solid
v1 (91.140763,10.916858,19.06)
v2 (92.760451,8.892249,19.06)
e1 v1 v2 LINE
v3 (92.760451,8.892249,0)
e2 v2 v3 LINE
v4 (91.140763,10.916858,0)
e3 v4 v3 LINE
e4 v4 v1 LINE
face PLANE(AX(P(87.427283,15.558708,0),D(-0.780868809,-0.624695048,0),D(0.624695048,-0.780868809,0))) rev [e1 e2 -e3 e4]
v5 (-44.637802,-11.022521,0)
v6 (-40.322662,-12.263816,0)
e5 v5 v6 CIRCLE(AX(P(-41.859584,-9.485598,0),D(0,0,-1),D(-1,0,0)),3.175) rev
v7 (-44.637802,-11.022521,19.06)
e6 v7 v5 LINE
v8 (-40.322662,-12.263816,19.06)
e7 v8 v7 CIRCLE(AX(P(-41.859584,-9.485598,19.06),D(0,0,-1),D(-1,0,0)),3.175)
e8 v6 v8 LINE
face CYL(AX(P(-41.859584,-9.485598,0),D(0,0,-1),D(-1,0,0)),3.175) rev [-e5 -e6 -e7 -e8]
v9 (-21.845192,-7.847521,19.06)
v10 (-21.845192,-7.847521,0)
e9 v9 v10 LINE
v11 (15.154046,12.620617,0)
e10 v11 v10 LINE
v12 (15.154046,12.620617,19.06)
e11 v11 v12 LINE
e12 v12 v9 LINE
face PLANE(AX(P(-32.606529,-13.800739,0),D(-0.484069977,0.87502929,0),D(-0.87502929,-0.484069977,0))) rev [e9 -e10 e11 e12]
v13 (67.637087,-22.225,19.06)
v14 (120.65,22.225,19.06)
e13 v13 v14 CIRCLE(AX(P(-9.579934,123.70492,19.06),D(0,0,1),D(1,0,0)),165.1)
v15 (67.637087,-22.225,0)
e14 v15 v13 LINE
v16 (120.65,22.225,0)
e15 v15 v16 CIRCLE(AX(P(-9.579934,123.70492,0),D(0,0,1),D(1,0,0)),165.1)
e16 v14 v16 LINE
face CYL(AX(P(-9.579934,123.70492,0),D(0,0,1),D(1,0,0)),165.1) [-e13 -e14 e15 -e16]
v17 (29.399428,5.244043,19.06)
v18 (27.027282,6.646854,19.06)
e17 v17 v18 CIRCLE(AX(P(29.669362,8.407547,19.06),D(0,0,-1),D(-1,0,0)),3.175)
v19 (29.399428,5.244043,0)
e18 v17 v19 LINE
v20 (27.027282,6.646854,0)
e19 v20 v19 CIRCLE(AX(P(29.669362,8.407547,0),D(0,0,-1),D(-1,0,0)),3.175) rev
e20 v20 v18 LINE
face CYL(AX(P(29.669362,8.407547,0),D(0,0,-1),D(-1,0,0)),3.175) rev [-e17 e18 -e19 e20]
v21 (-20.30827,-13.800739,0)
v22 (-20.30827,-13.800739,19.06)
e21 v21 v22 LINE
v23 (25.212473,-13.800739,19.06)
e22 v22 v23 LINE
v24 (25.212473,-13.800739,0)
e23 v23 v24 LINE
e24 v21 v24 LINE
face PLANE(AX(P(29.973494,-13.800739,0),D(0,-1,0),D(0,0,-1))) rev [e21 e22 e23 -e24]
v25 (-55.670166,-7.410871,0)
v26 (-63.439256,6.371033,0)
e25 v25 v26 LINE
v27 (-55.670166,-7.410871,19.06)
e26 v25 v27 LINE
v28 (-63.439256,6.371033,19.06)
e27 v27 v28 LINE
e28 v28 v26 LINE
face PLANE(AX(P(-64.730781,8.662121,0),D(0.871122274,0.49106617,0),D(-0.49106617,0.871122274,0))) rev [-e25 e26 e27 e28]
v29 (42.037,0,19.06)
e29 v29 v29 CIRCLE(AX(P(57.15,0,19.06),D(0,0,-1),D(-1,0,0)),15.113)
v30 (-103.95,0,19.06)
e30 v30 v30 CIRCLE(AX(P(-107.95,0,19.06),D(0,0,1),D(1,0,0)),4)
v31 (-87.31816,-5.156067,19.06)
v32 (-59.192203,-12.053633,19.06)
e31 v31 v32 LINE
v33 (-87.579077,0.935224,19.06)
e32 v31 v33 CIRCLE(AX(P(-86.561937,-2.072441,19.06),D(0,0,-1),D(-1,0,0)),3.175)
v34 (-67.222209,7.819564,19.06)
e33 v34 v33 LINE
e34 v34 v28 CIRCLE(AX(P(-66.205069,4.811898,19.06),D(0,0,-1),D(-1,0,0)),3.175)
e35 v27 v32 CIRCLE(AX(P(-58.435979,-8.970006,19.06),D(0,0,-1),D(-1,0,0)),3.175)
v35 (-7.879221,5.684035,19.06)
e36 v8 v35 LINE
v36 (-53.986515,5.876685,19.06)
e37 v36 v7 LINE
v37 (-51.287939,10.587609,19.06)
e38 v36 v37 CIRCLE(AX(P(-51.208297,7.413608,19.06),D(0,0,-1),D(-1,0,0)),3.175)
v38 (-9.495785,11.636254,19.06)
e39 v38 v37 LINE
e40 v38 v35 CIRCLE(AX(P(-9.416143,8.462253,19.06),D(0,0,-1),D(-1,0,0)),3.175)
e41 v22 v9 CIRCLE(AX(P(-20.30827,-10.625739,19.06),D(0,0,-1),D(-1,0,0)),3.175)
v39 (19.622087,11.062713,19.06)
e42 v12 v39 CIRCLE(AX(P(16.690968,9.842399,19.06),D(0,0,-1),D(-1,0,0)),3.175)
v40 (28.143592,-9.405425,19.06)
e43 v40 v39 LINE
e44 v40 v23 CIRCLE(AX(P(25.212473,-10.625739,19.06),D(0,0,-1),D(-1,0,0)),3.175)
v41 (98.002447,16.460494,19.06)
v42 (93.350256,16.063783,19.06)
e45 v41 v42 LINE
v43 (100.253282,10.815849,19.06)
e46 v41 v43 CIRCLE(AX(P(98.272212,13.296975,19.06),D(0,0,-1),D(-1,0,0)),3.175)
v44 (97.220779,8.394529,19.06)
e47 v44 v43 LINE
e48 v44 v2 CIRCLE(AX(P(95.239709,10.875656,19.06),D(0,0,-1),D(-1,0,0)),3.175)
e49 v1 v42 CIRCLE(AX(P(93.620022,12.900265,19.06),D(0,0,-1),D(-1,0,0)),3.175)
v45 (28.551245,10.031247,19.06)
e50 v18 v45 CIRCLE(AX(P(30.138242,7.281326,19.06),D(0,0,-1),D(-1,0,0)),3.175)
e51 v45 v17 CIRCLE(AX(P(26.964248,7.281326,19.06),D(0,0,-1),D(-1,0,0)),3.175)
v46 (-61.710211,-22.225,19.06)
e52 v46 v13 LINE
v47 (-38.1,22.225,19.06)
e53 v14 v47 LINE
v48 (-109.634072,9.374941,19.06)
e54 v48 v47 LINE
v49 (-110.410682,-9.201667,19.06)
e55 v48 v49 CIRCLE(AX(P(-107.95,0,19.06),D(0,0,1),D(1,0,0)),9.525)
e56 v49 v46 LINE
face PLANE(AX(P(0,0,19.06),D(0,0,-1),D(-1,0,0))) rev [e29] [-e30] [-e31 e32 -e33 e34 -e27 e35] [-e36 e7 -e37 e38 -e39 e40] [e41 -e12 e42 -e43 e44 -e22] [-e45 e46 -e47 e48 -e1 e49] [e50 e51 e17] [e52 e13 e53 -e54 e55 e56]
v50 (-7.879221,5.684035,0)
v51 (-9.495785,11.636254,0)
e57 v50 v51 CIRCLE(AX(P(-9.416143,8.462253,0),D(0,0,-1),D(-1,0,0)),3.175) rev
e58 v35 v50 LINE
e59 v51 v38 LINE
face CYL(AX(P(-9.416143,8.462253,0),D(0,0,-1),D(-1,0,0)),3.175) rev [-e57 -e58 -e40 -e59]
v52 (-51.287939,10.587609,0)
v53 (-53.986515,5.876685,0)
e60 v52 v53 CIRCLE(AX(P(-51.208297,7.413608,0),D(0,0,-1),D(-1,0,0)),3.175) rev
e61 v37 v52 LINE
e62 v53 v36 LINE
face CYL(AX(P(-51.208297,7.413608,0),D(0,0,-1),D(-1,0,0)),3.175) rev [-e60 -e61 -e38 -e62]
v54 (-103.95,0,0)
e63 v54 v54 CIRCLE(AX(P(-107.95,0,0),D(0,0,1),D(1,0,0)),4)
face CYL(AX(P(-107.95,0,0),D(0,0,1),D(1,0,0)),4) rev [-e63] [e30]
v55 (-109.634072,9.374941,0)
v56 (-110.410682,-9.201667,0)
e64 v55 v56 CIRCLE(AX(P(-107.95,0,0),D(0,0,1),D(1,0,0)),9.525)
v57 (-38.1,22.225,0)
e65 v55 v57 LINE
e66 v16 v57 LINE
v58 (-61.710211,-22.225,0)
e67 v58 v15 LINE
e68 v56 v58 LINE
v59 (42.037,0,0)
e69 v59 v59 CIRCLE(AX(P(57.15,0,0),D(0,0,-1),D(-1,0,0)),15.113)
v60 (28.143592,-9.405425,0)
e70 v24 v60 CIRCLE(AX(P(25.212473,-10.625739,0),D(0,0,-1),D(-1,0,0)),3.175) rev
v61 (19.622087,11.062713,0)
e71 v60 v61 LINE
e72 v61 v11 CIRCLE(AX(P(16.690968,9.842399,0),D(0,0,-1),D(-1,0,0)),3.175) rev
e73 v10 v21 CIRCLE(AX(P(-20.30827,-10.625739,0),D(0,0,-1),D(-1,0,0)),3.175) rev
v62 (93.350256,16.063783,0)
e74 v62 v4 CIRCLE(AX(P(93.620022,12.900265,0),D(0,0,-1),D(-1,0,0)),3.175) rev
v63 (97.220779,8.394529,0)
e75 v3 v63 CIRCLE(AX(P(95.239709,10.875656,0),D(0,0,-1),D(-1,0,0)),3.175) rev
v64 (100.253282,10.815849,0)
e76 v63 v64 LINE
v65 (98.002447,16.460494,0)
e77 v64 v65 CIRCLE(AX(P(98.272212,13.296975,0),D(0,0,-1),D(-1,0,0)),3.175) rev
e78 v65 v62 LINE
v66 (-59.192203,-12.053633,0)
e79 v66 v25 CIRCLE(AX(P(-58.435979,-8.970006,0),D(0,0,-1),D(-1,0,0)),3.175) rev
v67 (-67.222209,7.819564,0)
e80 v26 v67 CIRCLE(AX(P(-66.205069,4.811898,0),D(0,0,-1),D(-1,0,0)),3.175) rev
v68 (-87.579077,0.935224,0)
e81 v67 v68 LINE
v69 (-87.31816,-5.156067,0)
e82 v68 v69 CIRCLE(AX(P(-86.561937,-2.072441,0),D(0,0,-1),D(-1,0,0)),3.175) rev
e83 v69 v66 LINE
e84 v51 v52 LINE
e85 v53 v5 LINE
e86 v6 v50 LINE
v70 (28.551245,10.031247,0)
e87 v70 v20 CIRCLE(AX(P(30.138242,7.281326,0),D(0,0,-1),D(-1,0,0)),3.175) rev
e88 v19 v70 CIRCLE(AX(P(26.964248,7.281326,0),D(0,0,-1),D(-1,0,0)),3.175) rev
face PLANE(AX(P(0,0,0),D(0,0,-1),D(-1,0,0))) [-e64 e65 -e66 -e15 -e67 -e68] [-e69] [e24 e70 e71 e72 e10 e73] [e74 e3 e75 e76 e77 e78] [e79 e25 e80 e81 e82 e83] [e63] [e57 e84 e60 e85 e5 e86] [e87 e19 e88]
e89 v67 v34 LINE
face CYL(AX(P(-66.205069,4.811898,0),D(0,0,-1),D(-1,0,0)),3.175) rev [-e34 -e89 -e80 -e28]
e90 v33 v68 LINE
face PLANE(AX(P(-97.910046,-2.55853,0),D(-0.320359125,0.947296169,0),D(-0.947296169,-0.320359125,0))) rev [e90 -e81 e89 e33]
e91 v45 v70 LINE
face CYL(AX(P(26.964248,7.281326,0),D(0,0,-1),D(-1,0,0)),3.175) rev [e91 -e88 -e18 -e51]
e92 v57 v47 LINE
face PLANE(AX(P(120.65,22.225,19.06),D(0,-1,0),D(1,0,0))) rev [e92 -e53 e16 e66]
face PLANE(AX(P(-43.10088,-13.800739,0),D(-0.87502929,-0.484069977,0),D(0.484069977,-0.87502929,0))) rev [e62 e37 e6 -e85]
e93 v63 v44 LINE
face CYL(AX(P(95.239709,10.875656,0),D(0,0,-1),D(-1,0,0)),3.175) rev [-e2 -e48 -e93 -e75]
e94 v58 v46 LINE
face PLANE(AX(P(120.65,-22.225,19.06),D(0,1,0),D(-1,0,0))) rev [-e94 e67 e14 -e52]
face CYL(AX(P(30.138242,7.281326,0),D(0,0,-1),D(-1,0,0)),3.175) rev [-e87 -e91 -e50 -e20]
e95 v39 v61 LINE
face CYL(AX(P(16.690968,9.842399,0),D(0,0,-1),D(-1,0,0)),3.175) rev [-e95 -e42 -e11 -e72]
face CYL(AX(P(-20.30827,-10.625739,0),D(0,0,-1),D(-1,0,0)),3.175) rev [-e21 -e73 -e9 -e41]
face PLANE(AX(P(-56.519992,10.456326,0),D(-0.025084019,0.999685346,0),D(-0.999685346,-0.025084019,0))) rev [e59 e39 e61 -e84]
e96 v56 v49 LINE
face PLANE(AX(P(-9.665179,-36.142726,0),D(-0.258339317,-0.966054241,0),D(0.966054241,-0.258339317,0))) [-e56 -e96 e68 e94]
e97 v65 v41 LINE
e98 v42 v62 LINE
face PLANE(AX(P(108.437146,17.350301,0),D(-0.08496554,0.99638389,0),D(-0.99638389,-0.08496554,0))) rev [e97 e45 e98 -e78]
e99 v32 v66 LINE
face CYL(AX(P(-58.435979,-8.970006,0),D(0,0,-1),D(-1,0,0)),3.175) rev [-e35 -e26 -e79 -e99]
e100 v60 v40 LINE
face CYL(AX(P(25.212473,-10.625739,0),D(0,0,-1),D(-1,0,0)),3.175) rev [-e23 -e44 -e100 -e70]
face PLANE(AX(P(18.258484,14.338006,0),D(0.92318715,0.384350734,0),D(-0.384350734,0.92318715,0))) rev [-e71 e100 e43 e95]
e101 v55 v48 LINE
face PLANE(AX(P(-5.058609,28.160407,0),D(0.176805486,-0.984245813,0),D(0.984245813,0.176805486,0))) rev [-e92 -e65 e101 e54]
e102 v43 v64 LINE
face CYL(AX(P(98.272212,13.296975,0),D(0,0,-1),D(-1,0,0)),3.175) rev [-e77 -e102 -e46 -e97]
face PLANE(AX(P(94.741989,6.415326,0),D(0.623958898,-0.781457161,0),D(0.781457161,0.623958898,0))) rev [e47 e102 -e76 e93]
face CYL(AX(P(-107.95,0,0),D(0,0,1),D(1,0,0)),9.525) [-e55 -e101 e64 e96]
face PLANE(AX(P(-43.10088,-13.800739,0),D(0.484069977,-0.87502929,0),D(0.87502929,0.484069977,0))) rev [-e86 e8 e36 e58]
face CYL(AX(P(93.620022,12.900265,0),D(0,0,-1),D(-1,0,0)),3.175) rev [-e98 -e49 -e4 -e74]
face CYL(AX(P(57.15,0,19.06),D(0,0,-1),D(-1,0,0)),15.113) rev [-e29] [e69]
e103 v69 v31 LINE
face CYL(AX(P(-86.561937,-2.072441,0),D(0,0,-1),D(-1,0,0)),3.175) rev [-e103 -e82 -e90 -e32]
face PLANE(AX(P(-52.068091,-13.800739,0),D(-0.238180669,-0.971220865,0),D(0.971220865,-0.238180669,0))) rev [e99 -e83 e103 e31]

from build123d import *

# Parameters (mm, degrees)
SKETCH1_W           = 241.3
SKETCH1_H           = 44.45
BOSS_EXTRUDE1_DEPTH = 19.06
SKETCH3_R           = 4
CUT_EXTRUDE1_DEPTH  = 125.151748779
CUT_EXTRUDE2_DEPTH  = 125.151748779
SKETCH11_R          = 15.113
CUT_EXTRUDE3_DEPTH  = 125.151748779
CUT_EXTRUDE5_DEPTH  = 125.151748779
FILLET1_R           = 3.175


with BuildPart() as part:
    # Sketch1 → Boss-Extrude1 (new body)
    with BuildSketch(Plane.XY):
        Rectangle(SKETCH1_W, SKETCH1_H)
    extrude(amount=BOSS_EXTRUDE1_DEPTH)

    # Sketch3 → Cut-Extrude1 (cut, through all)
    with BuildSketch(Plane.XY.offset(19.06)):
        with Locations((-107.95, 0)):
            Circle(SKETCH3_R)
    extrude(amount=-CUT_EXTRUDE1_DEPTH, mode=Mode.SUBTRACT)

    # Sketch5 → Cut-Extrude2 (cut, through all)
    with BuildSketch(Plane.XY.offset(19.06)):
        with BuildLine():
            ThreePointArc((67.637087091, -22.225), (96.497916739, -2.807923084), (120.65, 22.225))
            Line((120.65, 22.225), (120.65, -22.225))
            Line((120.65, -22.225), (67.637087091, -22.225))
        make_face()
        with BuildLine():
            Line((-61.710210997, -22.225), (-110.410681995, -9.201666649))
            ThreePointArc((-110.410681995, -9.201666649), (-117.466687359, 0.397852617), (-109.634072253, 9.374941368))
            Line((-109.634072253, 9.374941368), (-38.1, 22.225))
            Line((-38.1, 22.225), (-120.65, 22.225))
            Line((-120.65, 22.225), (-120.65, -22.225))
            Line((-120.65, -22.225), (-61.710210997, -22.225))
        make_face()
    extrude(amount=-CUT_EXTRUDE2_DEPTH, mode=Mode.SUBTRACT)

    # Sketch11 → Cut-Extrude3 (cut, through all)
    with BuildSketch(Plane(origin=(0, 0, 0), x_dir=(-1, 0, 0), z_dir=(0, 0, -1))):
        with Locations((-57.15, 0)):
            Circle(SKETCH11_R)
    extrude(amount=-CUT_EXTRUDE3_DEPTH, mode=Mode.SUBTRACT)

    # Sketch14 → Cut-Extrude5 (cut, through all)
    with BuildSketch(Plane.XY.offset(19.06)):
        Polygon((87.427282936, 15.558708401), (94.741989073, 6.41532573), (108.43714596, 17.350301349), align=None)
        Polygon((18.258483502, 14.338005817), (29.973493873, -13.800738505), (-32.606529101, -13.800738505), align=None)
        Polygon((-43.100879601, -13.800738505), (3.468328331, 11.961548148), (-56.519992491, 10.456326363), align=None)
        Polygon((-64.730780564, 8.662121496), (-52.068091334, -13.800738505), (-97.910045601, -2.558530136), align=None)
        Polygon((25.377220315, 10.456326363), (27.958556135, 4.256114298), (42.851089432, 10.456326363), align=None)
    extrude(amount=-CUT_EXTRUDE5_DEPTH, mode=Mode.SUBTRACT)

    # Fillet1
    # the kernel refuses this fillet: 3.175 mm, written as the material it adds along each edge
    with BuildSketch(Plane(origin=(-64.730780564, 8.662121496, 19.06), x_dir=(-0.9472961687281491, -0.32035912459764615, 0), z_dir=(0, 0, -1))) as fillet1_piece_1:
        with BuildLine():
            CenterArc((FILLET1_R * 0.828359701977, -FILLET1_R), FILLET1_R, 90, 79.273962625)
            Line((-FILLET1_R * 0.154168619156, -FILLET1_R * 0.813886867277), (0, 0))
            Line((0, 0), (FILLET1_R * 0.828359701977, 0))
        make_face()
    extrude(amount=19.06)
    with BuildSketch(Plane(origin=(-52.068091334, -13.800738505, 19.06), x_dir=(-0.9712208651423397, 0.23818066905642277, 0), z_dir=(0, 0, -1))) as fillet1_piece_2:
        with BuildLine():
            CenterArc((FILLET1_R * 2.310303232, FILLET1_R), FILLET1_R, 136.810131201, 133.189868799)
            Line((FILLET1_R * 1.58121357242, FILLET1_R * 1.68441819694), (0, 0))
            Line((0, 0), (FILLET1_R * 2.310303232, 0))
        make_face()
    extrude(amount=19.06)
    with BuildSketch(Plane(origin=(-97.910045601, -2.558530136, 19.06), x_dir=(0.9472961687281494, 0.32035912459764504, 0), z_dir=(0, 0, -1))) as fillet1_piece_3:
        with BuildLine():
            CenterArc((FILLET1_R * 3.43487976267, FILLET1_R), FILLET1_R, 122.463831423, 147.536168577)
            Line((FILLET1_R * 2.89811266126, FILLET1_R * 1.8437304539), (0, 0))
            Line((0, 0), (FILLET1_R * 3.43487976267, 0))
        make_face()
    extrude(amount=19.06)
    with BuildSketch(Plane(origin=(-56.519992491, 10.456326363, 19.06), x_dir=(0.9996853464994547, 0.025084018702456384, 0), z_dir=(0, 0, -1))) as fillet1_piece_4:
        with BuildLine():
            CenterArc((FILLET1_R * 1.64840949376, FILLET1_R), FILLET1_R, 152.485801408, 117.514198592)
            Line((FILLET1_R * 0.761513114746, FILLET1_R * 1.46196841114), (0, 0))
            Line((0, 0), (FILLET1_R * 1.64840949376, 0))
        make_face()
    extrude(amount=19.06)
    with BuildSketch(Plane(origin=(3.468328331, 11.961548148, 19.06), x_dir=(-0.8750292896969416, -0.48406997652453715, 0), z_dir=(0, 0, -1))) as fillet1_piece_5:
        with BuildLine():
            CenterArc((FILLET1_R * 4.08447056876, FILLET1_R), FILLET1_R, 117.514198592, 152.485801408)
            Line((FILLET1_R * 3.62250215761, FILLET1_R * 1.88689637901), (0, 0))
            Line((0, 0), (FILLET1_R * 4.08447056876, 0))
        make_face()
    extrude(amount=19.06)
    with BuildSketch(Plane(origin=(-43.100879601, -13.800738505, 19.06), x_dir=(0.8750292896969416, 0.48406997652453704, 0), z_dir=(0, 0, -1))) as fillet1_piece_6:
        with BuildLine():
            CenterArc((FILLET1_R, -FILLET1_R), FILLET1_R, 90, 90)
            Line((0, -FILLET1_R), (0, 0))
            Line((0, 0), (FILLET1_R, 0))
        make_face()
    extrude(amount=19.06)
    with BuildSketch(Plane(origin=(-32.606529101, -13.800738505, 19.06), x_dir=(0.8750292896969417, 0.48406997652453687, 0), z_dir=(0, 0, -1))) as fillet1_piece_7:
        with BuildLine():
            CenterArc((FILLET1_R * 3.87346743369, FILLET1_R), FILLET1_R, 118.951557757, 151.048442243)
            Line((FILLET1_R * 3.38939745717, FILLET1_R * 1.8750292897), (0, 0))
            Line((0, 0), (FILLET1_R * 3.87346743369, 0))
        make_face()
    extrude(amount=19.06)
    with BuildSketch(Plane(origin=(18.258483502, 14.338005817, 19.06), x_dir=(-0.8750292896969422, -0.4840699765245361, 0), z_dir=(0, 0, -1))) as fillet1_piece_8:
        with BuildLine():
            CenterArc((FILLET1_R * 1.11742055595, -FILLET1_R), FILLET1_R, 90, 96.348118808)
            Line((FILLET1_R * 0.123552109362, -FILLET1_R * 1.11056903214), (0, 0))
            Line((0, 0), (FILLET1_R * 1.11742055595, 0))
        make_face()
    extrude(amount=19.06)
    with BuildSketch(Plane(origin=(29.973493873, -13.800738505, 19.06), x_dir=(-1, 0, 0), z_dir=(0, 0, -1))) as fillet1_piece_9:
        with BuildLine():
            CenterArc((FILLET1_R * 1.49953423253, FILLET1_R), FILLET1_R, 157.396561051, 112.603438949)
            Line((FILLET1_R * 0.576347082868, FILLET1_R * 1.38435073396), (0, 0))
            Line((0, 0), (FILLET1_R * 1.49953423253, 0))
        make_face()
    extrude(amount=19.06)
    with BuildSketch(Plane(origin=(87.427282936, 15.558708401, 19.06), x_dir=(0.6246950475544248, -0.7808688094430298, 0), z_dir=(0, 0, -1))) as fillet1_piece_10:
        with BuildLine():
            CenterArc((FILLET1_R * 1.87227376636, -FILLET1_R), FILLET1_R, 90, 123.785764981)
            Line((FILLET1_R * 1.04115111223, -FILLET1_R * 1.55608914195), (0, 0))
            Line((0, 0), (FILLET1_R * 1.87227376636, 0))
        make_face()
    extrude(amount=19.06)
    with BuildSketch(Plane(origin=(108.43714596, 17.350301349, 19.06), x_dir=(-0.7814571605260681, -0.6239588978951538, 0), z_dir=(0, 0, -1))) as fillet1_piece_11:
        with BuildLine():
            CenterArc((FILLET1_R * 3.2984470476, FILLET1_R), FILLET1_R, 123.731770788, 146.268229212)
            Line((FILLET1_R * 2.74314138288, FILLET1_R * 1.83164633032), (0, 0))
            Line((0, 0), (FILLET1_R * 3.2984470476, 0))
        make_face()
    extrude(amount=19.06)
    with BuildSketch(Plane(origin=(94.741989073, 6.41532573, 19.06), x_dir=(-0.6246950475544234, 0.7808688094430309, 0), z_dir=(0, 0, -1))) as fillet1_piece_12:
        with BuildLine():
            CenterArc((FILLET1_R * 0.999058067303, FILLET1_R), FILLET1_R, 180.053994194, 89.946005806)
            Line((-FILLET1_R * 0.000941488660736, FILLET1_R * 0.999057623684), (0, 0))
            Line((0, 0), (FILLET1_R * 0.999058067303, 0))
        make_face()
    extrude(amount=19.06)
    with BuildSketch(Plane(origin=(27.958556135, 4.256114298, 19.06), x_dir=(-0.3843507339571626, 0.9231871496650018, 0), z_dir=(0, 0, -1))) as fillet1_piece_13:
        with BuildLine():
            CenterArc((FILLET1_R, FILLET1_R), FILLET1_R, 180, 90)
            Line((0, FILLET1_R), (0, 0))
            Line((0, 0), (FILLET1_R, 0))
        make_face()
    extrude(amount=19.06)
    with BuildSketch(Plane(origin=(42.851089432, 10.456326363, 19.06), x_dir=(-0.9231871496650015, -0.3843507339571632, 0), z_dir=(0, 0, -1))) as fillet1_piece_14:
        with BuildLine():
            CenterArc((FILLET1_R * 5.003729614, FILLET1_R), FILLET1_R, 112.603438949, 157.396561051)
            Line((FILLET1_R * 4.61937888005, FILLET1_R * 1.92318714967), (0, 0))
            Line((0, 0), (FILLET1_R * 5.003729614, 0))
        make_face()
    extrude(amount=19.06)
    with BuildSketch(Plane(origin=(25.377220315, 10.456326363, 19.06), x_dir=(0.3843507339571629, -0.9231871496650017, 0), z_dir=(0, 0, -1))) as fillet1_piece_15:
        with BuildLine():
            CenterArc((FILLET1_R * 1.49953423253, -FILLET1_R), FILLET1_R, 90, 112.603438949)
            Line((FILLET1_R * 0.576347082868, -FILLET1_R * 1.38435073396), (0, 0))
            Line((0, 0), (FILLET1_R * 1.49953423253, 0))
        make_face()
    extrude(amount=19.06)


solid = part.part
